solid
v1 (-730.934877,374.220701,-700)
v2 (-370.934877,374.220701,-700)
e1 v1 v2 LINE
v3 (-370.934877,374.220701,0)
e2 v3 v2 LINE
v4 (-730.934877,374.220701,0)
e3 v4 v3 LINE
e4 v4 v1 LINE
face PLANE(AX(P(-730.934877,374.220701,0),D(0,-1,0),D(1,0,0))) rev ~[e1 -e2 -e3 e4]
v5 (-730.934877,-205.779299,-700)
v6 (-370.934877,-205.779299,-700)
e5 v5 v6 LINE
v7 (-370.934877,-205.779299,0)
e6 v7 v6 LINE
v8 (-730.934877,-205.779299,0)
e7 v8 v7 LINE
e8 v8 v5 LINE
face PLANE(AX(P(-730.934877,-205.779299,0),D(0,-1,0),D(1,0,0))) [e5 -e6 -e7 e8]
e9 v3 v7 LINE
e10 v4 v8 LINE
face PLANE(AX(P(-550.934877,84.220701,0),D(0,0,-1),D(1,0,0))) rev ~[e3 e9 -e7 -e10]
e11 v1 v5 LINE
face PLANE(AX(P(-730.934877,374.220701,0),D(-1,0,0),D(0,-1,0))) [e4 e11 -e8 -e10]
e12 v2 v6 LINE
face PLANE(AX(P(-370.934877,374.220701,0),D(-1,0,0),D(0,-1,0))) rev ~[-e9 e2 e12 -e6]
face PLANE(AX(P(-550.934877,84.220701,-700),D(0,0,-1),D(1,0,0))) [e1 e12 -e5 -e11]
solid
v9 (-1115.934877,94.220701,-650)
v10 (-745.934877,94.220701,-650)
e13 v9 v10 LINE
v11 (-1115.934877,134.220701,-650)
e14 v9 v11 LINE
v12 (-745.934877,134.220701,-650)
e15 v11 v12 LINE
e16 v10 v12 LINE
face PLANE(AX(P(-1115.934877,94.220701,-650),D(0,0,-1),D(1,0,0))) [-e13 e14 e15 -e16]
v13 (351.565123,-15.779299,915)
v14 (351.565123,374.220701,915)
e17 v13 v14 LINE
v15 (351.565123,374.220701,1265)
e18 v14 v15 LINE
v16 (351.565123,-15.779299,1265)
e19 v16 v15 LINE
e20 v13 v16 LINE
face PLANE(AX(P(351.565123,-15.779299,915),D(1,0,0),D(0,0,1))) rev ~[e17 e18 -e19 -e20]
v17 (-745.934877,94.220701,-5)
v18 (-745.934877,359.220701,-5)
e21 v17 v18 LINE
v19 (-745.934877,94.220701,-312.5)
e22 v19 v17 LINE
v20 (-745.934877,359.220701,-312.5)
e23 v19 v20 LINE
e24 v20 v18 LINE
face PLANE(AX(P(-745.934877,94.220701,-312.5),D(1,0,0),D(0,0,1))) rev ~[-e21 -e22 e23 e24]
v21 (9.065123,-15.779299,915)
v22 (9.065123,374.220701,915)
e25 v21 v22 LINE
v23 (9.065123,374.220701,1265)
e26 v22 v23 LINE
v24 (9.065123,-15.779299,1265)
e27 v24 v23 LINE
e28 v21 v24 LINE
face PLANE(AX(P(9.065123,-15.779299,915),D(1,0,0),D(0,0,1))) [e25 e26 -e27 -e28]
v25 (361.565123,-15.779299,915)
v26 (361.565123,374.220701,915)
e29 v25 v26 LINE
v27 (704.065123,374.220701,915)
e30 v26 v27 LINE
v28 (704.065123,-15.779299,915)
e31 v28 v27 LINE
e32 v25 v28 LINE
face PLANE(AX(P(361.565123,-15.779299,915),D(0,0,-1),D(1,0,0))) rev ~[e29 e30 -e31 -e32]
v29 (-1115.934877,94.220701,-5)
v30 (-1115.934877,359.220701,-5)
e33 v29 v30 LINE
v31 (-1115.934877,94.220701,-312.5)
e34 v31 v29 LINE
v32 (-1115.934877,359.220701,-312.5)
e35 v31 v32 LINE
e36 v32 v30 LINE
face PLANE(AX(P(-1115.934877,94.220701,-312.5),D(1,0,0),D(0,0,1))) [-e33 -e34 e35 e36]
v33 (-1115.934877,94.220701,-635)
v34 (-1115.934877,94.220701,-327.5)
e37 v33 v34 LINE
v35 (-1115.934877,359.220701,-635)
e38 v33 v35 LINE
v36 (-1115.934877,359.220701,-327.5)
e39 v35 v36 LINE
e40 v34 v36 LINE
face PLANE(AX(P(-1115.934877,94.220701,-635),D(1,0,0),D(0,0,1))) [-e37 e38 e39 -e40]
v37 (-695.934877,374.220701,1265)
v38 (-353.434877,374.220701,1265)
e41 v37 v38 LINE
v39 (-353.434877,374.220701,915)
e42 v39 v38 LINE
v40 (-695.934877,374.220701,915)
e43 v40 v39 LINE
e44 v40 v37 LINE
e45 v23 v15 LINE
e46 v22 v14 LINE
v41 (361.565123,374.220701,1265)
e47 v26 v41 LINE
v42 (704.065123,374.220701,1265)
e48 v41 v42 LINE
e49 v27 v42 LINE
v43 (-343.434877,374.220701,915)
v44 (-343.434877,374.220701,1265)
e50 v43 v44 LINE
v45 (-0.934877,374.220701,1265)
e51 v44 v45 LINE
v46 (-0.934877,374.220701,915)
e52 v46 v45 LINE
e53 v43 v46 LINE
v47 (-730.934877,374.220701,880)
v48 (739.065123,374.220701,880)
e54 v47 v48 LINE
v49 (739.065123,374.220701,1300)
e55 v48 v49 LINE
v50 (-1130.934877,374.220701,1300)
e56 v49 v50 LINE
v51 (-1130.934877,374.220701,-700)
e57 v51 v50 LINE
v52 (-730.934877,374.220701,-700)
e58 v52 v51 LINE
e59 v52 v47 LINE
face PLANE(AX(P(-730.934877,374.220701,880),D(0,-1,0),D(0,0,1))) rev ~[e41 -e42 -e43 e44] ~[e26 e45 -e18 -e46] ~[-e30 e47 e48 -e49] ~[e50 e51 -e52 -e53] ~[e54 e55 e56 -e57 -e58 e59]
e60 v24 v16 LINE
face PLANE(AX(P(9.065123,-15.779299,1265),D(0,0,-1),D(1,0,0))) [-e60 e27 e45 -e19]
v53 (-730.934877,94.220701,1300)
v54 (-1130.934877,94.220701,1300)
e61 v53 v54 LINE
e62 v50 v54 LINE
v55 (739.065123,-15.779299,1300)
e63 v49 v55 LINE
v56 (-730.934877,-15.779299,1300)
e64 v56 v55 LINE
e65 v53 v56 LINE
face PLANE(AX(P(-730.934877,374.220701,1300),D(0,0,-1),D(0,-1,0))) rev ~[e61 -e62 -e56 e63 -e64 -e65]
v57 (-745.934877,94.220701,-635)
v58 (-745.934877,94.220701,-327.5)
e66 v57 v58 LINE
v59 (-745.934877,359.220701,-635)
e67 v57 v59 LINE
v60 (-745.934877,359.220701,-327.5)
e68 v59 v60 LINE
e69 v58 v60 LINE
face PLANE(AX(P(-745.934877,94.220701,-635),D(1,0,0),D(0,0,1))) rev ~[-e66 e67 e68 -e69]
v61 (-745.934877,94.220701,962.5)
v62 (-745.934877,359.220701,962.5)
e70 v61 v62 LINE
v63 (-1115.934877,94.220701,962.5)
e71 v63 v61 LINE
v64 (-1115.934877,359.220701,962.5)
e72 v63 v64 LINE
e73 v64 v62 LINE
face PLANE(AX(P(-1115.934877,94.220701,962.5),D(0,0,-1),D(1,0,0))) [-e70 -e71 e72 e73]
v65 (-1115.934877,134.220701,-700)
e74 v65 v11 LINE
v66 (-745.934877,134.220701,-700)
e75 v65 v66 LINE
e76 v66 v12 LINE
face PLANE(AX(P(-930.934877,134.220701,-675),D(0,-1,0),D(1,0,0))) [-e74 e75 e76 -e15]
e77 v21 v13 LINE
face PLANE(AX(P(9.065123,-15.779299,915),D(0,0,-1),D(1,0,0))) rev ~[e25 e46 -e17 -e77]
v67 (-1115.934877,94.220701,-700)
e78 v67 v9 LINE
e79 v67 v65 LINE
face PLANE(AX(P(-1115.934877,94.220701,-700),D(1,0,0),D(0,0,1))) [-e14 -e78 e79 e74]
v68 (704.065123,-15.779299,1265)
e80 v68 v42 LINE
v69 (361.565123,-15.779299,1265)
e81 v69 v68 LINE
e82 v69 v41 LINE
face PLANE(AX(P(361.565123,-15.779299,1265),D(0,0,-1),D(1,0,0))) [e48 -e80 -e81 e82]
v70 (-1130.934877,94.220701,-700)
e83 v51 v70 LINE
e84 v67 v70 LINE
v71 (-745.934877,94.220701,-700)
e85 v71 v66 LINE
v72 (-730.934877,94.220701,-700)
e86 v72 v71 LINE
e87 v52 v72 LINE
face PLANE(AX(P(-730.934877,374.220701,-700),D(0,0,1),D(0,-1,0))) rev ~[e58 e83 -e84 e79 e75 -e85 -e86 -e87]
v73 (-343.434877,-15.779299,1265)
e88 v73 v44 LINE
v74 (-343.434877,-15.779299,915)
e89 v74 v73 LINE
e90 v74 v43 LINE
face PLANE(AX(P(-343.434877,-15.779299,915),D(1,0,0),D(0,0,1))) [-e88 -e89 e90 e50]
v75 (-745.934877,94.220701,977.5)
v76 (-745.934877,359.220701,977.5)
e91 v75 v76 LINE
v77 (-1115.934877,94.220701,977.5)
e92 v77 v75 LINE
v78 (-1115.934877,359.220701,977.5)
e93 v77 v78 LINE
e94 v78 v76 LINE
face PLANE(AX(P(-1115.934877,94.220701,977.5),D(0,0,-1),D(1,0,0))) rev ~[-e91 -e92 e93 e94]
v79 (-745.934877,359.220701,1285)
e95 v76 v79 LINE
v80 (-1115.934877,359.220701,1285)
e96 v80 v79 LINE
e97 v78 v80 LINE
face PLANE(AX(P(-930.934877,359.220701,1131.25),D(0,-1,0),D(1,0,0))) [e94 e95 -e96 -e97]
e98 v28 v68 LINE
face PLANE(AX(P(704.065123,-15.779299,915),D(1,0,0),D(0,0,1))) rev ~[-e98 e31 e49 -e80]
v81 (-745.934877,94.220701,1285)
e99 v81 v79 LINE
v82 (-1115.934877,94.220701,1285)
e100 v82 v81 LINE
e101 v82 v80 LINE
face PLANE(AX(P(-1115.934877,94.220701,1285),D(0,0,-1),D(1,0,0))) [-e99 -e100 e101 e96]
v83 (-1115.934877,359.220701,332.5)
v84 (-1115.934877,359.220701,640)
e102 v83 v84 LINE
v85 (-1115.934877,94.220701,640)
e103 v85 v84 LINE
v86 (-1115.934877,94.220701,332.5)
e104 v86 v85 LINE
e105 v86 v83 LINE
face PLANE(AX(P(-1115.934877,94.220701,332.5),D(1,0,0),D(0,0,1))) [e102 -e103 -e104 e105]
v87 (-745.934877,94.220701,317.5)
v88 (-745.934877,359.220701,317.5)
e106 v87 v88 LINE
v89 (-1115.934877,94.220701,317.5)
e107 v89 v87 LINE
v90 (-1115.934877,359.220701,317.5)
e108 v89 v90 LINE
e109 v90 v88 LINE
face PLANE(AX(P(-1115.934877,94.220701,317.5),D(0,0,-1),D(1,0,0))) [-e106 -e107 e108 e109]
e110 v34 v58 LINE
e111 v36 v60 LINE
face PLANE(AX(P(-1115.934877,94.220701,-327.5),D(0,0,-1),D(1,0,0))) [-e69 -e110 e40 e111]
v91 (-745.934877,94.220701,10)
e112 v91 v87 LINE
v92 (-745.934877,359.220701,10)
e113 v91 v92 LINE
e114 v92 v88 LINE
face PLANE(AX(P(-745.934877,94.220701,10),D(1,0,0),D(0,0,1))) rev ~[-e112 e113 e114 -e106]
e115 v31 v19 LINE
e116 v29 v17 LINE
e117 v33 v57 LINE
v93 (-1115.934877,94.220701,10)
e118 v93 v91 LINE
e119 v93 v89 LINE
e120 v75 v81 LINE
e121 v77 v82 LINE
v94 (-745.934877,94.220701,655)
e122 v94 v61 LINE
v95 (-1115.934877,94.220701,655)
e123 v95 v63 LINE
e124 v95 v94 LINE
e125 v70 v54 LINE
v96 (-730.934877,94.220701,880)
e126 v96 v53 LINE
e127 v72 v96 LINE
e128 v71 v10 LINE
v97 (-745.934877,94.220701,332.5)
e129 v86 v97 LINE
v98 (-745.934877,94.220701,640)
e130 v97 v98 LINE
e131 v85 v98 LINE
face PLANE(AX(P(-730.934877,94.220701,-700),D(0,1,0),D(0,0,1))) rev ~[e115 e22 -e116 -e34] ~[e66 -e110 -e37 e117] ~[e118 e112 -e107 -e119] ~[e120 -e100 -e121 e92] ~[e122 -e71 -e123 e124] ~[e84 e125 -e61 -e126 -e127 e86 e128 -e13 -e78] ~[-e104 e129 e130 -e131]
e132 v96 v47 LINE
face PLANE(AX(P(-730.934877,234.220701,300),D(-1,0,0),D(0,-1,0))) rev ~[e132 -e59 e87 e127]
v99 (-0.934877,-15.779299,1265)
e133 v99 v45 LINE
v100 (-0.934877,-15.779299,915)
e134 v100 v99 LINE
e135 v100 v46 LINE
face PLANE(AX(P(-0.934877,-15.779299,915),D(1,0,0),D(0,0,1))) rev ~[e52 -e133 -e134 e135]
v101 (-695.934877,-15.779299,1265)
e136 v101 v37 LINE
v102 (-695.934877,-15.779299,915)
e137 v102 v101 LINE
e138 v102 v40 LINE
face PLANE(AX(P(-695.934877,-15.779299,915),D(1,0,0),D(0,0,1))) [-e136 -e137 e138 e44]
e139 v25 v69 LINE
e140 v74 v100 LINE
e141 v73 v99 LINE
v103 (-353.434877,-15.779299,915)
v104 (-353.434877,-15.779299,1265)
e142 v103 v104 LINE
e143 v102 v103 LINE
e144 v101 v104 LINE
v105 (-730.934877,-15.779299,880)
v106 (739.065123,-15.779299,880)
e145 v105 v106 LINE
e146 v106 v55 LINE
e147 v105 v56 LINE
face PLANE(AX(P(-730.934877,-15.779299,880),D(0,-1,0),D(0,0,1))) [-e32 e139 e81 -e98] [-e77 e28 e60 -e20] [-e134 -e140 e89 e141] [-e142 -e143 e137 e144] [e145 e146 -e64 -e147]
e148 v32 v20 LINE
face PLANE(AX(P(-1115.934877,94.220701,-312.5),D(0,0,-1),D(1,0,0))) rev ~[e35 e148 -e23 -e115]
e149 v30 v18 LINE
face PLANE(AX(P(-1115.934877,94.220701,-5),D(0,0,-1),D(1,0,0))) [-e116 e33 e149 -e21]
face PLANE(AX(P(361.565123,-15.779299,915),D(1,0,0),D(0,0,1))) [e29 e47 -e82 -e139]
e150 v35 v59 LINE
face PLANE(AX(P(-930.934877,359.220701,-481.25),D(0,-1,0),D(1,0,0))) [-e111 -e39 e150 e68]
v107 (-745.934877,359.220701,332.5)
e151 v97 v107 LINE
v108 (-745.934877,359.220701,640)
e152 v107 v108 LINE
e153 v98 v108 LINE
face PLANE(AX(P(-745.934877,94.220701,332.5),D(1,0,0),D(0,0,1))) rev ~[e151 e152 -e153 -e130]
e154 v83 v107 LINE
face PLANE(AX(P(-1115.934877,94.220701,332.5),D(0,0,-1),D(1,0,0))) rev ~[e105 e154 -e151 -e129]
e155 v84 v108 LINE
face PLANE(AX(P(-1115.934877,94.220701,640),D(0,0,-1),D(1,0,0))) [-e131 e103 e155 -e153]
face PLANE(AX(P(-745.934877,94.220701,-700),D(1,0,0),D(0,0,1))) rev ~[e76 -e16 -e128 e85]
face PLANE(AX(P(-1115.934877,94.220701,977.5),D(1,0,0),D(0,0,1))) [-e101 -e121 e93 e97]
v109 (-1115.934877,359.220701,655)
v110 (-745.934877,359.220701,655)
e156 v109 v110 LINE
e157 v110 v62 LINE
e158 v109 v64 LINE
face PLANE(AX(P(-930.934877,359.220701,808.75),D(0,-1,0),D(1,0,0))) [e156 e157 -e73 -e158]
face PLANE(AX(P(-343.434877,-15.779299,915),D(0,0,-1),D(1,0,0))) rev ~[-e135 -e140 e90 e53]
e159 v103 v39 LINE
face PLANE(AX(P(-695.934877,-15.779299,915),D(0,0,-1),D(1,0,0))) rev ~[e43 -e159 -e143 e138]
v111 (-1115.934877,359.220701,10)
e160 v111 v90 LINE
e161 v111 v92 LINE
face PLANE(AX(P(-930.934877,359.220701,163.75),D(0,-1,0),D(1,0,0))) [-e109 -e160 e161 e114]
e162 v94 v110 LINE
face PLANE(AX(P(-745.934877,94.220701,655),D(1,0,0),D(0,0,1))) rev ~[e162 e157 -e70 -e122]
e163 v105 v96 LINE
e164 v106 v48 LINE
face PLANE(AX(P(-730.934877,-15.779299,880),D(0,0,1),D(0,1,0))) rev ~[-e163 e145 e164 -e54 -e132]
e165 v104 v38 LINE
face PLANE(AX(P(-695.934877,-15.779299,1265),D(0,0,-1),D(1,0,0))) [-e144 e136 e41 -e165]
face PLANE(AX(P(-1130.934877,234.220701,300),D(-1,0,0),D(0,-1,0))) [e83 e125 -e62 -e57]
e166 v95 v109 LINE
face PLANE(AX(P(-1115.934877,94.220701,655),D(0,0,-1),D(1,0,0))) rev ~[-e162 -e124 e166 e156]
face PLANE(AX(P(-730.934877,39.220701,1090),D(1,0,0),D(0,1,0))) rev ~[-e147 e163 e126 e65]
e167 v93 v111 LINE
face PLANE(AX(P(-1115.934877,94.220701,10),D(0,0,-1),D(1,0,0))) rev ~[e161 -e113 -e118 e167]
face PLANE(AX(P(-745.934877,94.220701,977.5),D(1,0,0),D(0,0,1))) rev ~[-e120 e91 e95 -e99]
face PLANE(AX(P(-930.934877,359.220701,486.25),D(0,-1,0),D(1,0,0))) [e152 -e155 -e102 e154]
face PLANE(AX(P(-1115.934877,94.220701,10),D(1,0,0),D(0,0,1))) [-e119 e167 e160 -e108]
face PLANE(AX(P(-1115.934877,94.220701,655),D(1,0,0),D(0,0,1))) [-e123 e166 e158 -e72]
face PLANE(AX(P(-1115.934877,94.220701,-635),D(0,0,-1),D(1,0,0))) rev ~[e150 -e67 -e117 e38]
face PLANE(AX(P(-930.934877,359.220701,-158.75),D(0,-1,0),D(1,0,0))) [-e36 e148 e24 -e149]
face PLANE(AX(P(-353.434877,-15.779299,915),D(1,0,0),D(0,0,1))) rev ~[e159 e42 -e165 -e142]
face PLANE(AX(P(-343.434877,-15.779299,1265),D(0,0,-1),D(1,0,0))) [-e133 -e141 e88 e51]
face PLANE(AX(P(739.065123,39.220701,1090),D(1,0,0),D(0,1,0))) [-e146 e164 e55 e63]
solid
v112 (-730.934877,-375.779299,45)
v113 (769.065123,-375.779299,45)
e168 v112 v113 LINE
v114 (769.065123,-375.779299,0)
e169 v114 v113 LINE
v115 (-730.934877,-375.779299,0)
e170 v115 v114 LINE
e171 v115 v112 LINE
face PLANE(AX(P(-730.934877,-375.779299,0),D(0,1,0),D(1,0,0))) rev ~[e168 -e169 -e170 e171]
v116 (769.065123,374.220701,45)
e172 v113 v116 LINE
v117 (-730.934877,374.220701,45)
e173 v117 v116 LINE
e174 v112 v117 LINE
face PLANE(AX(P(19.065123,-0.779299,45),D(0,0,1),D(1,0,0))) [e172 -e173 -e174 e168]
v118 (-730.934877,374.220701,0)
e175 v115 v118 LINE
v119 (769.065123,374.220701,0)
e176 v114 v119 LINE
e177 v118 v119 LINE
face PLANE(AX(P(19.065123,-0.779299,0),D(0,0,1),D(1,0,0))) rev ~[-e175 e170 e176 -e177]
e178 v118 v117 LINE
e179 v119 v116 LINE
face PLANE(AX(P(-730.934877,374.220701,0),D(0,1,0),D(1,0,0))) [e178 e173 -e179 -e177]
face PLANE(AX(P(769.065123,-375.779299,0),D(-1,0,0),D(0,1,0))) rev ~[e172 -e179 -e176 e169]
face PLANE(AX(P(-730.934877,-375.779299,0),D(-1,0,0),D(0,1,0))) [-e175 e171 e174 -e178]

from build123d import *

# Parameters (mm, degrees)
F0_W      = 1500
F0_H      = 750
F1_DEPTH  = 45
F2_W      = 360
F2_H      = 580
F3_DEPTH  = 700
F8_W      = 280
F8_H      = 2000
F9_DEPTH  = 400
F10_W     = 370
F10_H     = 307.5
F11_DEPTH = 265
F10_H_2   = 50
F12_DEPTH = 40
F13_W     = 110
F13_H     = 420
F13_W_2   = 280
F14_DEPTH = 1470
F15_W     = 342.5
F15_H     = 350
F16_DEPTH = 390


# Not quite as in the source:
# - the program builds the solid bodies; features that only make, move or delete a surface that nothing else refers to are left out


with BuildPart() as f1:
    # F0 (on Top) → F1 (new body)
    with BuildSketch(Plane.XY):
        with Locations((19.0651228034, -0.7792990655)):
            Rectangle(F0_W, F0_H)
    extrude(amount=F1_DEPTH)


with BuildPart() as f3:
    # F2 (on face) → F3 (new body)
    with BuildSketch(Plane(origin=(0, 0, 0), x_dir=(1, 0, 0), z_dir=(0, 0, -1))):
        with Locations((-550.9348771966, -84.2207009345)):
            Rectangle(F2_W, F2_H)
    extrude(amount=F3_DEPTH)


with BuildPart() as f9:
    # F8 (on face) → F9 (new body)
    with BuildSketch(Plane(origin=(-730.9348771966, 0, 0), x_dir=(0, -1, 0), z_dir=(-1, 0, 0))):
        with Locations((-234.2207009345, 300)):
            Rectangle(F8_W, F8_H)
    extrude(amount=F9_DEPTH)

    # F10 (on face) → F11 (cut)
    with BuildSketch(Plane.XZ.offset(-94.2207009345)):
        with Locations((-930.9348771966, -481.25)):
            Rectangle(F10_W, F10_H)
        with Locations((-930.9348771966, -158.75)):
            Rectangle(F10_W, F10_H)
        with Locations((-930.9348771966, 163.75)):
            Rectangle(F10_W, F10_H)
        with Locations((-930.9348771966, 486.25)):
            Rectangle(F10_W, F10_H)
        with Locations((-930.9348771966, 808.75)):
            Rectangle(F10_W, F10_H)
        with Locations((-930.9348771966, 1131.25)):
            Rectangle(F10_W, F10_H)
    extrude(amount=-F11_DEPTH, mode=Mode.SUBTRACT)

    # F10 (on face) → F12 (cut)
    with BuildSketch(Plane.XZ.offset(-94.2207009345)):
        with Locations((-930.9348771966, -675)):
            Rectangle(F10_W, F10_H_2)
    extrude(amount=-F12_DEPTH, mode=Mode.SUBTRACT)

    # F13 (on face) → F14 (join)
    with BuildSketch(Plane.YZ.offset(-730.9348771966)):
        with Locations((39.2207009345, 1090)):
            Rectangle(F13_W, F13_H)
        with Locations((234.2207009345, 1090)):
            Rectangle(F13_W_2, F13_H)
    extrude(amount=F14_DEPTH)

    # F15 (on face) → F16 (cut)
    with BuildSketch(Plane.XZ.offset(15.7792990655)):
        with Locations((-524.6848771966, 1090)):
            Rectangle(F15_W, F15_H)
        with Locations((-172.1848771966, 1090)):
            Rectangle(F15_W, F15_H)
        with Locations((180.3151228034, 1090)):
            Rectangle(F15_W, F15_H)
        with Locations((532.8151228034, 1090)):
            Rectangle(F15_W, F15_H)
    extrude(amount=-F16_DEPTH, mode=Mode.SUBTRACT)


solid = Compound([f1.part, f3.part, f9.part])
